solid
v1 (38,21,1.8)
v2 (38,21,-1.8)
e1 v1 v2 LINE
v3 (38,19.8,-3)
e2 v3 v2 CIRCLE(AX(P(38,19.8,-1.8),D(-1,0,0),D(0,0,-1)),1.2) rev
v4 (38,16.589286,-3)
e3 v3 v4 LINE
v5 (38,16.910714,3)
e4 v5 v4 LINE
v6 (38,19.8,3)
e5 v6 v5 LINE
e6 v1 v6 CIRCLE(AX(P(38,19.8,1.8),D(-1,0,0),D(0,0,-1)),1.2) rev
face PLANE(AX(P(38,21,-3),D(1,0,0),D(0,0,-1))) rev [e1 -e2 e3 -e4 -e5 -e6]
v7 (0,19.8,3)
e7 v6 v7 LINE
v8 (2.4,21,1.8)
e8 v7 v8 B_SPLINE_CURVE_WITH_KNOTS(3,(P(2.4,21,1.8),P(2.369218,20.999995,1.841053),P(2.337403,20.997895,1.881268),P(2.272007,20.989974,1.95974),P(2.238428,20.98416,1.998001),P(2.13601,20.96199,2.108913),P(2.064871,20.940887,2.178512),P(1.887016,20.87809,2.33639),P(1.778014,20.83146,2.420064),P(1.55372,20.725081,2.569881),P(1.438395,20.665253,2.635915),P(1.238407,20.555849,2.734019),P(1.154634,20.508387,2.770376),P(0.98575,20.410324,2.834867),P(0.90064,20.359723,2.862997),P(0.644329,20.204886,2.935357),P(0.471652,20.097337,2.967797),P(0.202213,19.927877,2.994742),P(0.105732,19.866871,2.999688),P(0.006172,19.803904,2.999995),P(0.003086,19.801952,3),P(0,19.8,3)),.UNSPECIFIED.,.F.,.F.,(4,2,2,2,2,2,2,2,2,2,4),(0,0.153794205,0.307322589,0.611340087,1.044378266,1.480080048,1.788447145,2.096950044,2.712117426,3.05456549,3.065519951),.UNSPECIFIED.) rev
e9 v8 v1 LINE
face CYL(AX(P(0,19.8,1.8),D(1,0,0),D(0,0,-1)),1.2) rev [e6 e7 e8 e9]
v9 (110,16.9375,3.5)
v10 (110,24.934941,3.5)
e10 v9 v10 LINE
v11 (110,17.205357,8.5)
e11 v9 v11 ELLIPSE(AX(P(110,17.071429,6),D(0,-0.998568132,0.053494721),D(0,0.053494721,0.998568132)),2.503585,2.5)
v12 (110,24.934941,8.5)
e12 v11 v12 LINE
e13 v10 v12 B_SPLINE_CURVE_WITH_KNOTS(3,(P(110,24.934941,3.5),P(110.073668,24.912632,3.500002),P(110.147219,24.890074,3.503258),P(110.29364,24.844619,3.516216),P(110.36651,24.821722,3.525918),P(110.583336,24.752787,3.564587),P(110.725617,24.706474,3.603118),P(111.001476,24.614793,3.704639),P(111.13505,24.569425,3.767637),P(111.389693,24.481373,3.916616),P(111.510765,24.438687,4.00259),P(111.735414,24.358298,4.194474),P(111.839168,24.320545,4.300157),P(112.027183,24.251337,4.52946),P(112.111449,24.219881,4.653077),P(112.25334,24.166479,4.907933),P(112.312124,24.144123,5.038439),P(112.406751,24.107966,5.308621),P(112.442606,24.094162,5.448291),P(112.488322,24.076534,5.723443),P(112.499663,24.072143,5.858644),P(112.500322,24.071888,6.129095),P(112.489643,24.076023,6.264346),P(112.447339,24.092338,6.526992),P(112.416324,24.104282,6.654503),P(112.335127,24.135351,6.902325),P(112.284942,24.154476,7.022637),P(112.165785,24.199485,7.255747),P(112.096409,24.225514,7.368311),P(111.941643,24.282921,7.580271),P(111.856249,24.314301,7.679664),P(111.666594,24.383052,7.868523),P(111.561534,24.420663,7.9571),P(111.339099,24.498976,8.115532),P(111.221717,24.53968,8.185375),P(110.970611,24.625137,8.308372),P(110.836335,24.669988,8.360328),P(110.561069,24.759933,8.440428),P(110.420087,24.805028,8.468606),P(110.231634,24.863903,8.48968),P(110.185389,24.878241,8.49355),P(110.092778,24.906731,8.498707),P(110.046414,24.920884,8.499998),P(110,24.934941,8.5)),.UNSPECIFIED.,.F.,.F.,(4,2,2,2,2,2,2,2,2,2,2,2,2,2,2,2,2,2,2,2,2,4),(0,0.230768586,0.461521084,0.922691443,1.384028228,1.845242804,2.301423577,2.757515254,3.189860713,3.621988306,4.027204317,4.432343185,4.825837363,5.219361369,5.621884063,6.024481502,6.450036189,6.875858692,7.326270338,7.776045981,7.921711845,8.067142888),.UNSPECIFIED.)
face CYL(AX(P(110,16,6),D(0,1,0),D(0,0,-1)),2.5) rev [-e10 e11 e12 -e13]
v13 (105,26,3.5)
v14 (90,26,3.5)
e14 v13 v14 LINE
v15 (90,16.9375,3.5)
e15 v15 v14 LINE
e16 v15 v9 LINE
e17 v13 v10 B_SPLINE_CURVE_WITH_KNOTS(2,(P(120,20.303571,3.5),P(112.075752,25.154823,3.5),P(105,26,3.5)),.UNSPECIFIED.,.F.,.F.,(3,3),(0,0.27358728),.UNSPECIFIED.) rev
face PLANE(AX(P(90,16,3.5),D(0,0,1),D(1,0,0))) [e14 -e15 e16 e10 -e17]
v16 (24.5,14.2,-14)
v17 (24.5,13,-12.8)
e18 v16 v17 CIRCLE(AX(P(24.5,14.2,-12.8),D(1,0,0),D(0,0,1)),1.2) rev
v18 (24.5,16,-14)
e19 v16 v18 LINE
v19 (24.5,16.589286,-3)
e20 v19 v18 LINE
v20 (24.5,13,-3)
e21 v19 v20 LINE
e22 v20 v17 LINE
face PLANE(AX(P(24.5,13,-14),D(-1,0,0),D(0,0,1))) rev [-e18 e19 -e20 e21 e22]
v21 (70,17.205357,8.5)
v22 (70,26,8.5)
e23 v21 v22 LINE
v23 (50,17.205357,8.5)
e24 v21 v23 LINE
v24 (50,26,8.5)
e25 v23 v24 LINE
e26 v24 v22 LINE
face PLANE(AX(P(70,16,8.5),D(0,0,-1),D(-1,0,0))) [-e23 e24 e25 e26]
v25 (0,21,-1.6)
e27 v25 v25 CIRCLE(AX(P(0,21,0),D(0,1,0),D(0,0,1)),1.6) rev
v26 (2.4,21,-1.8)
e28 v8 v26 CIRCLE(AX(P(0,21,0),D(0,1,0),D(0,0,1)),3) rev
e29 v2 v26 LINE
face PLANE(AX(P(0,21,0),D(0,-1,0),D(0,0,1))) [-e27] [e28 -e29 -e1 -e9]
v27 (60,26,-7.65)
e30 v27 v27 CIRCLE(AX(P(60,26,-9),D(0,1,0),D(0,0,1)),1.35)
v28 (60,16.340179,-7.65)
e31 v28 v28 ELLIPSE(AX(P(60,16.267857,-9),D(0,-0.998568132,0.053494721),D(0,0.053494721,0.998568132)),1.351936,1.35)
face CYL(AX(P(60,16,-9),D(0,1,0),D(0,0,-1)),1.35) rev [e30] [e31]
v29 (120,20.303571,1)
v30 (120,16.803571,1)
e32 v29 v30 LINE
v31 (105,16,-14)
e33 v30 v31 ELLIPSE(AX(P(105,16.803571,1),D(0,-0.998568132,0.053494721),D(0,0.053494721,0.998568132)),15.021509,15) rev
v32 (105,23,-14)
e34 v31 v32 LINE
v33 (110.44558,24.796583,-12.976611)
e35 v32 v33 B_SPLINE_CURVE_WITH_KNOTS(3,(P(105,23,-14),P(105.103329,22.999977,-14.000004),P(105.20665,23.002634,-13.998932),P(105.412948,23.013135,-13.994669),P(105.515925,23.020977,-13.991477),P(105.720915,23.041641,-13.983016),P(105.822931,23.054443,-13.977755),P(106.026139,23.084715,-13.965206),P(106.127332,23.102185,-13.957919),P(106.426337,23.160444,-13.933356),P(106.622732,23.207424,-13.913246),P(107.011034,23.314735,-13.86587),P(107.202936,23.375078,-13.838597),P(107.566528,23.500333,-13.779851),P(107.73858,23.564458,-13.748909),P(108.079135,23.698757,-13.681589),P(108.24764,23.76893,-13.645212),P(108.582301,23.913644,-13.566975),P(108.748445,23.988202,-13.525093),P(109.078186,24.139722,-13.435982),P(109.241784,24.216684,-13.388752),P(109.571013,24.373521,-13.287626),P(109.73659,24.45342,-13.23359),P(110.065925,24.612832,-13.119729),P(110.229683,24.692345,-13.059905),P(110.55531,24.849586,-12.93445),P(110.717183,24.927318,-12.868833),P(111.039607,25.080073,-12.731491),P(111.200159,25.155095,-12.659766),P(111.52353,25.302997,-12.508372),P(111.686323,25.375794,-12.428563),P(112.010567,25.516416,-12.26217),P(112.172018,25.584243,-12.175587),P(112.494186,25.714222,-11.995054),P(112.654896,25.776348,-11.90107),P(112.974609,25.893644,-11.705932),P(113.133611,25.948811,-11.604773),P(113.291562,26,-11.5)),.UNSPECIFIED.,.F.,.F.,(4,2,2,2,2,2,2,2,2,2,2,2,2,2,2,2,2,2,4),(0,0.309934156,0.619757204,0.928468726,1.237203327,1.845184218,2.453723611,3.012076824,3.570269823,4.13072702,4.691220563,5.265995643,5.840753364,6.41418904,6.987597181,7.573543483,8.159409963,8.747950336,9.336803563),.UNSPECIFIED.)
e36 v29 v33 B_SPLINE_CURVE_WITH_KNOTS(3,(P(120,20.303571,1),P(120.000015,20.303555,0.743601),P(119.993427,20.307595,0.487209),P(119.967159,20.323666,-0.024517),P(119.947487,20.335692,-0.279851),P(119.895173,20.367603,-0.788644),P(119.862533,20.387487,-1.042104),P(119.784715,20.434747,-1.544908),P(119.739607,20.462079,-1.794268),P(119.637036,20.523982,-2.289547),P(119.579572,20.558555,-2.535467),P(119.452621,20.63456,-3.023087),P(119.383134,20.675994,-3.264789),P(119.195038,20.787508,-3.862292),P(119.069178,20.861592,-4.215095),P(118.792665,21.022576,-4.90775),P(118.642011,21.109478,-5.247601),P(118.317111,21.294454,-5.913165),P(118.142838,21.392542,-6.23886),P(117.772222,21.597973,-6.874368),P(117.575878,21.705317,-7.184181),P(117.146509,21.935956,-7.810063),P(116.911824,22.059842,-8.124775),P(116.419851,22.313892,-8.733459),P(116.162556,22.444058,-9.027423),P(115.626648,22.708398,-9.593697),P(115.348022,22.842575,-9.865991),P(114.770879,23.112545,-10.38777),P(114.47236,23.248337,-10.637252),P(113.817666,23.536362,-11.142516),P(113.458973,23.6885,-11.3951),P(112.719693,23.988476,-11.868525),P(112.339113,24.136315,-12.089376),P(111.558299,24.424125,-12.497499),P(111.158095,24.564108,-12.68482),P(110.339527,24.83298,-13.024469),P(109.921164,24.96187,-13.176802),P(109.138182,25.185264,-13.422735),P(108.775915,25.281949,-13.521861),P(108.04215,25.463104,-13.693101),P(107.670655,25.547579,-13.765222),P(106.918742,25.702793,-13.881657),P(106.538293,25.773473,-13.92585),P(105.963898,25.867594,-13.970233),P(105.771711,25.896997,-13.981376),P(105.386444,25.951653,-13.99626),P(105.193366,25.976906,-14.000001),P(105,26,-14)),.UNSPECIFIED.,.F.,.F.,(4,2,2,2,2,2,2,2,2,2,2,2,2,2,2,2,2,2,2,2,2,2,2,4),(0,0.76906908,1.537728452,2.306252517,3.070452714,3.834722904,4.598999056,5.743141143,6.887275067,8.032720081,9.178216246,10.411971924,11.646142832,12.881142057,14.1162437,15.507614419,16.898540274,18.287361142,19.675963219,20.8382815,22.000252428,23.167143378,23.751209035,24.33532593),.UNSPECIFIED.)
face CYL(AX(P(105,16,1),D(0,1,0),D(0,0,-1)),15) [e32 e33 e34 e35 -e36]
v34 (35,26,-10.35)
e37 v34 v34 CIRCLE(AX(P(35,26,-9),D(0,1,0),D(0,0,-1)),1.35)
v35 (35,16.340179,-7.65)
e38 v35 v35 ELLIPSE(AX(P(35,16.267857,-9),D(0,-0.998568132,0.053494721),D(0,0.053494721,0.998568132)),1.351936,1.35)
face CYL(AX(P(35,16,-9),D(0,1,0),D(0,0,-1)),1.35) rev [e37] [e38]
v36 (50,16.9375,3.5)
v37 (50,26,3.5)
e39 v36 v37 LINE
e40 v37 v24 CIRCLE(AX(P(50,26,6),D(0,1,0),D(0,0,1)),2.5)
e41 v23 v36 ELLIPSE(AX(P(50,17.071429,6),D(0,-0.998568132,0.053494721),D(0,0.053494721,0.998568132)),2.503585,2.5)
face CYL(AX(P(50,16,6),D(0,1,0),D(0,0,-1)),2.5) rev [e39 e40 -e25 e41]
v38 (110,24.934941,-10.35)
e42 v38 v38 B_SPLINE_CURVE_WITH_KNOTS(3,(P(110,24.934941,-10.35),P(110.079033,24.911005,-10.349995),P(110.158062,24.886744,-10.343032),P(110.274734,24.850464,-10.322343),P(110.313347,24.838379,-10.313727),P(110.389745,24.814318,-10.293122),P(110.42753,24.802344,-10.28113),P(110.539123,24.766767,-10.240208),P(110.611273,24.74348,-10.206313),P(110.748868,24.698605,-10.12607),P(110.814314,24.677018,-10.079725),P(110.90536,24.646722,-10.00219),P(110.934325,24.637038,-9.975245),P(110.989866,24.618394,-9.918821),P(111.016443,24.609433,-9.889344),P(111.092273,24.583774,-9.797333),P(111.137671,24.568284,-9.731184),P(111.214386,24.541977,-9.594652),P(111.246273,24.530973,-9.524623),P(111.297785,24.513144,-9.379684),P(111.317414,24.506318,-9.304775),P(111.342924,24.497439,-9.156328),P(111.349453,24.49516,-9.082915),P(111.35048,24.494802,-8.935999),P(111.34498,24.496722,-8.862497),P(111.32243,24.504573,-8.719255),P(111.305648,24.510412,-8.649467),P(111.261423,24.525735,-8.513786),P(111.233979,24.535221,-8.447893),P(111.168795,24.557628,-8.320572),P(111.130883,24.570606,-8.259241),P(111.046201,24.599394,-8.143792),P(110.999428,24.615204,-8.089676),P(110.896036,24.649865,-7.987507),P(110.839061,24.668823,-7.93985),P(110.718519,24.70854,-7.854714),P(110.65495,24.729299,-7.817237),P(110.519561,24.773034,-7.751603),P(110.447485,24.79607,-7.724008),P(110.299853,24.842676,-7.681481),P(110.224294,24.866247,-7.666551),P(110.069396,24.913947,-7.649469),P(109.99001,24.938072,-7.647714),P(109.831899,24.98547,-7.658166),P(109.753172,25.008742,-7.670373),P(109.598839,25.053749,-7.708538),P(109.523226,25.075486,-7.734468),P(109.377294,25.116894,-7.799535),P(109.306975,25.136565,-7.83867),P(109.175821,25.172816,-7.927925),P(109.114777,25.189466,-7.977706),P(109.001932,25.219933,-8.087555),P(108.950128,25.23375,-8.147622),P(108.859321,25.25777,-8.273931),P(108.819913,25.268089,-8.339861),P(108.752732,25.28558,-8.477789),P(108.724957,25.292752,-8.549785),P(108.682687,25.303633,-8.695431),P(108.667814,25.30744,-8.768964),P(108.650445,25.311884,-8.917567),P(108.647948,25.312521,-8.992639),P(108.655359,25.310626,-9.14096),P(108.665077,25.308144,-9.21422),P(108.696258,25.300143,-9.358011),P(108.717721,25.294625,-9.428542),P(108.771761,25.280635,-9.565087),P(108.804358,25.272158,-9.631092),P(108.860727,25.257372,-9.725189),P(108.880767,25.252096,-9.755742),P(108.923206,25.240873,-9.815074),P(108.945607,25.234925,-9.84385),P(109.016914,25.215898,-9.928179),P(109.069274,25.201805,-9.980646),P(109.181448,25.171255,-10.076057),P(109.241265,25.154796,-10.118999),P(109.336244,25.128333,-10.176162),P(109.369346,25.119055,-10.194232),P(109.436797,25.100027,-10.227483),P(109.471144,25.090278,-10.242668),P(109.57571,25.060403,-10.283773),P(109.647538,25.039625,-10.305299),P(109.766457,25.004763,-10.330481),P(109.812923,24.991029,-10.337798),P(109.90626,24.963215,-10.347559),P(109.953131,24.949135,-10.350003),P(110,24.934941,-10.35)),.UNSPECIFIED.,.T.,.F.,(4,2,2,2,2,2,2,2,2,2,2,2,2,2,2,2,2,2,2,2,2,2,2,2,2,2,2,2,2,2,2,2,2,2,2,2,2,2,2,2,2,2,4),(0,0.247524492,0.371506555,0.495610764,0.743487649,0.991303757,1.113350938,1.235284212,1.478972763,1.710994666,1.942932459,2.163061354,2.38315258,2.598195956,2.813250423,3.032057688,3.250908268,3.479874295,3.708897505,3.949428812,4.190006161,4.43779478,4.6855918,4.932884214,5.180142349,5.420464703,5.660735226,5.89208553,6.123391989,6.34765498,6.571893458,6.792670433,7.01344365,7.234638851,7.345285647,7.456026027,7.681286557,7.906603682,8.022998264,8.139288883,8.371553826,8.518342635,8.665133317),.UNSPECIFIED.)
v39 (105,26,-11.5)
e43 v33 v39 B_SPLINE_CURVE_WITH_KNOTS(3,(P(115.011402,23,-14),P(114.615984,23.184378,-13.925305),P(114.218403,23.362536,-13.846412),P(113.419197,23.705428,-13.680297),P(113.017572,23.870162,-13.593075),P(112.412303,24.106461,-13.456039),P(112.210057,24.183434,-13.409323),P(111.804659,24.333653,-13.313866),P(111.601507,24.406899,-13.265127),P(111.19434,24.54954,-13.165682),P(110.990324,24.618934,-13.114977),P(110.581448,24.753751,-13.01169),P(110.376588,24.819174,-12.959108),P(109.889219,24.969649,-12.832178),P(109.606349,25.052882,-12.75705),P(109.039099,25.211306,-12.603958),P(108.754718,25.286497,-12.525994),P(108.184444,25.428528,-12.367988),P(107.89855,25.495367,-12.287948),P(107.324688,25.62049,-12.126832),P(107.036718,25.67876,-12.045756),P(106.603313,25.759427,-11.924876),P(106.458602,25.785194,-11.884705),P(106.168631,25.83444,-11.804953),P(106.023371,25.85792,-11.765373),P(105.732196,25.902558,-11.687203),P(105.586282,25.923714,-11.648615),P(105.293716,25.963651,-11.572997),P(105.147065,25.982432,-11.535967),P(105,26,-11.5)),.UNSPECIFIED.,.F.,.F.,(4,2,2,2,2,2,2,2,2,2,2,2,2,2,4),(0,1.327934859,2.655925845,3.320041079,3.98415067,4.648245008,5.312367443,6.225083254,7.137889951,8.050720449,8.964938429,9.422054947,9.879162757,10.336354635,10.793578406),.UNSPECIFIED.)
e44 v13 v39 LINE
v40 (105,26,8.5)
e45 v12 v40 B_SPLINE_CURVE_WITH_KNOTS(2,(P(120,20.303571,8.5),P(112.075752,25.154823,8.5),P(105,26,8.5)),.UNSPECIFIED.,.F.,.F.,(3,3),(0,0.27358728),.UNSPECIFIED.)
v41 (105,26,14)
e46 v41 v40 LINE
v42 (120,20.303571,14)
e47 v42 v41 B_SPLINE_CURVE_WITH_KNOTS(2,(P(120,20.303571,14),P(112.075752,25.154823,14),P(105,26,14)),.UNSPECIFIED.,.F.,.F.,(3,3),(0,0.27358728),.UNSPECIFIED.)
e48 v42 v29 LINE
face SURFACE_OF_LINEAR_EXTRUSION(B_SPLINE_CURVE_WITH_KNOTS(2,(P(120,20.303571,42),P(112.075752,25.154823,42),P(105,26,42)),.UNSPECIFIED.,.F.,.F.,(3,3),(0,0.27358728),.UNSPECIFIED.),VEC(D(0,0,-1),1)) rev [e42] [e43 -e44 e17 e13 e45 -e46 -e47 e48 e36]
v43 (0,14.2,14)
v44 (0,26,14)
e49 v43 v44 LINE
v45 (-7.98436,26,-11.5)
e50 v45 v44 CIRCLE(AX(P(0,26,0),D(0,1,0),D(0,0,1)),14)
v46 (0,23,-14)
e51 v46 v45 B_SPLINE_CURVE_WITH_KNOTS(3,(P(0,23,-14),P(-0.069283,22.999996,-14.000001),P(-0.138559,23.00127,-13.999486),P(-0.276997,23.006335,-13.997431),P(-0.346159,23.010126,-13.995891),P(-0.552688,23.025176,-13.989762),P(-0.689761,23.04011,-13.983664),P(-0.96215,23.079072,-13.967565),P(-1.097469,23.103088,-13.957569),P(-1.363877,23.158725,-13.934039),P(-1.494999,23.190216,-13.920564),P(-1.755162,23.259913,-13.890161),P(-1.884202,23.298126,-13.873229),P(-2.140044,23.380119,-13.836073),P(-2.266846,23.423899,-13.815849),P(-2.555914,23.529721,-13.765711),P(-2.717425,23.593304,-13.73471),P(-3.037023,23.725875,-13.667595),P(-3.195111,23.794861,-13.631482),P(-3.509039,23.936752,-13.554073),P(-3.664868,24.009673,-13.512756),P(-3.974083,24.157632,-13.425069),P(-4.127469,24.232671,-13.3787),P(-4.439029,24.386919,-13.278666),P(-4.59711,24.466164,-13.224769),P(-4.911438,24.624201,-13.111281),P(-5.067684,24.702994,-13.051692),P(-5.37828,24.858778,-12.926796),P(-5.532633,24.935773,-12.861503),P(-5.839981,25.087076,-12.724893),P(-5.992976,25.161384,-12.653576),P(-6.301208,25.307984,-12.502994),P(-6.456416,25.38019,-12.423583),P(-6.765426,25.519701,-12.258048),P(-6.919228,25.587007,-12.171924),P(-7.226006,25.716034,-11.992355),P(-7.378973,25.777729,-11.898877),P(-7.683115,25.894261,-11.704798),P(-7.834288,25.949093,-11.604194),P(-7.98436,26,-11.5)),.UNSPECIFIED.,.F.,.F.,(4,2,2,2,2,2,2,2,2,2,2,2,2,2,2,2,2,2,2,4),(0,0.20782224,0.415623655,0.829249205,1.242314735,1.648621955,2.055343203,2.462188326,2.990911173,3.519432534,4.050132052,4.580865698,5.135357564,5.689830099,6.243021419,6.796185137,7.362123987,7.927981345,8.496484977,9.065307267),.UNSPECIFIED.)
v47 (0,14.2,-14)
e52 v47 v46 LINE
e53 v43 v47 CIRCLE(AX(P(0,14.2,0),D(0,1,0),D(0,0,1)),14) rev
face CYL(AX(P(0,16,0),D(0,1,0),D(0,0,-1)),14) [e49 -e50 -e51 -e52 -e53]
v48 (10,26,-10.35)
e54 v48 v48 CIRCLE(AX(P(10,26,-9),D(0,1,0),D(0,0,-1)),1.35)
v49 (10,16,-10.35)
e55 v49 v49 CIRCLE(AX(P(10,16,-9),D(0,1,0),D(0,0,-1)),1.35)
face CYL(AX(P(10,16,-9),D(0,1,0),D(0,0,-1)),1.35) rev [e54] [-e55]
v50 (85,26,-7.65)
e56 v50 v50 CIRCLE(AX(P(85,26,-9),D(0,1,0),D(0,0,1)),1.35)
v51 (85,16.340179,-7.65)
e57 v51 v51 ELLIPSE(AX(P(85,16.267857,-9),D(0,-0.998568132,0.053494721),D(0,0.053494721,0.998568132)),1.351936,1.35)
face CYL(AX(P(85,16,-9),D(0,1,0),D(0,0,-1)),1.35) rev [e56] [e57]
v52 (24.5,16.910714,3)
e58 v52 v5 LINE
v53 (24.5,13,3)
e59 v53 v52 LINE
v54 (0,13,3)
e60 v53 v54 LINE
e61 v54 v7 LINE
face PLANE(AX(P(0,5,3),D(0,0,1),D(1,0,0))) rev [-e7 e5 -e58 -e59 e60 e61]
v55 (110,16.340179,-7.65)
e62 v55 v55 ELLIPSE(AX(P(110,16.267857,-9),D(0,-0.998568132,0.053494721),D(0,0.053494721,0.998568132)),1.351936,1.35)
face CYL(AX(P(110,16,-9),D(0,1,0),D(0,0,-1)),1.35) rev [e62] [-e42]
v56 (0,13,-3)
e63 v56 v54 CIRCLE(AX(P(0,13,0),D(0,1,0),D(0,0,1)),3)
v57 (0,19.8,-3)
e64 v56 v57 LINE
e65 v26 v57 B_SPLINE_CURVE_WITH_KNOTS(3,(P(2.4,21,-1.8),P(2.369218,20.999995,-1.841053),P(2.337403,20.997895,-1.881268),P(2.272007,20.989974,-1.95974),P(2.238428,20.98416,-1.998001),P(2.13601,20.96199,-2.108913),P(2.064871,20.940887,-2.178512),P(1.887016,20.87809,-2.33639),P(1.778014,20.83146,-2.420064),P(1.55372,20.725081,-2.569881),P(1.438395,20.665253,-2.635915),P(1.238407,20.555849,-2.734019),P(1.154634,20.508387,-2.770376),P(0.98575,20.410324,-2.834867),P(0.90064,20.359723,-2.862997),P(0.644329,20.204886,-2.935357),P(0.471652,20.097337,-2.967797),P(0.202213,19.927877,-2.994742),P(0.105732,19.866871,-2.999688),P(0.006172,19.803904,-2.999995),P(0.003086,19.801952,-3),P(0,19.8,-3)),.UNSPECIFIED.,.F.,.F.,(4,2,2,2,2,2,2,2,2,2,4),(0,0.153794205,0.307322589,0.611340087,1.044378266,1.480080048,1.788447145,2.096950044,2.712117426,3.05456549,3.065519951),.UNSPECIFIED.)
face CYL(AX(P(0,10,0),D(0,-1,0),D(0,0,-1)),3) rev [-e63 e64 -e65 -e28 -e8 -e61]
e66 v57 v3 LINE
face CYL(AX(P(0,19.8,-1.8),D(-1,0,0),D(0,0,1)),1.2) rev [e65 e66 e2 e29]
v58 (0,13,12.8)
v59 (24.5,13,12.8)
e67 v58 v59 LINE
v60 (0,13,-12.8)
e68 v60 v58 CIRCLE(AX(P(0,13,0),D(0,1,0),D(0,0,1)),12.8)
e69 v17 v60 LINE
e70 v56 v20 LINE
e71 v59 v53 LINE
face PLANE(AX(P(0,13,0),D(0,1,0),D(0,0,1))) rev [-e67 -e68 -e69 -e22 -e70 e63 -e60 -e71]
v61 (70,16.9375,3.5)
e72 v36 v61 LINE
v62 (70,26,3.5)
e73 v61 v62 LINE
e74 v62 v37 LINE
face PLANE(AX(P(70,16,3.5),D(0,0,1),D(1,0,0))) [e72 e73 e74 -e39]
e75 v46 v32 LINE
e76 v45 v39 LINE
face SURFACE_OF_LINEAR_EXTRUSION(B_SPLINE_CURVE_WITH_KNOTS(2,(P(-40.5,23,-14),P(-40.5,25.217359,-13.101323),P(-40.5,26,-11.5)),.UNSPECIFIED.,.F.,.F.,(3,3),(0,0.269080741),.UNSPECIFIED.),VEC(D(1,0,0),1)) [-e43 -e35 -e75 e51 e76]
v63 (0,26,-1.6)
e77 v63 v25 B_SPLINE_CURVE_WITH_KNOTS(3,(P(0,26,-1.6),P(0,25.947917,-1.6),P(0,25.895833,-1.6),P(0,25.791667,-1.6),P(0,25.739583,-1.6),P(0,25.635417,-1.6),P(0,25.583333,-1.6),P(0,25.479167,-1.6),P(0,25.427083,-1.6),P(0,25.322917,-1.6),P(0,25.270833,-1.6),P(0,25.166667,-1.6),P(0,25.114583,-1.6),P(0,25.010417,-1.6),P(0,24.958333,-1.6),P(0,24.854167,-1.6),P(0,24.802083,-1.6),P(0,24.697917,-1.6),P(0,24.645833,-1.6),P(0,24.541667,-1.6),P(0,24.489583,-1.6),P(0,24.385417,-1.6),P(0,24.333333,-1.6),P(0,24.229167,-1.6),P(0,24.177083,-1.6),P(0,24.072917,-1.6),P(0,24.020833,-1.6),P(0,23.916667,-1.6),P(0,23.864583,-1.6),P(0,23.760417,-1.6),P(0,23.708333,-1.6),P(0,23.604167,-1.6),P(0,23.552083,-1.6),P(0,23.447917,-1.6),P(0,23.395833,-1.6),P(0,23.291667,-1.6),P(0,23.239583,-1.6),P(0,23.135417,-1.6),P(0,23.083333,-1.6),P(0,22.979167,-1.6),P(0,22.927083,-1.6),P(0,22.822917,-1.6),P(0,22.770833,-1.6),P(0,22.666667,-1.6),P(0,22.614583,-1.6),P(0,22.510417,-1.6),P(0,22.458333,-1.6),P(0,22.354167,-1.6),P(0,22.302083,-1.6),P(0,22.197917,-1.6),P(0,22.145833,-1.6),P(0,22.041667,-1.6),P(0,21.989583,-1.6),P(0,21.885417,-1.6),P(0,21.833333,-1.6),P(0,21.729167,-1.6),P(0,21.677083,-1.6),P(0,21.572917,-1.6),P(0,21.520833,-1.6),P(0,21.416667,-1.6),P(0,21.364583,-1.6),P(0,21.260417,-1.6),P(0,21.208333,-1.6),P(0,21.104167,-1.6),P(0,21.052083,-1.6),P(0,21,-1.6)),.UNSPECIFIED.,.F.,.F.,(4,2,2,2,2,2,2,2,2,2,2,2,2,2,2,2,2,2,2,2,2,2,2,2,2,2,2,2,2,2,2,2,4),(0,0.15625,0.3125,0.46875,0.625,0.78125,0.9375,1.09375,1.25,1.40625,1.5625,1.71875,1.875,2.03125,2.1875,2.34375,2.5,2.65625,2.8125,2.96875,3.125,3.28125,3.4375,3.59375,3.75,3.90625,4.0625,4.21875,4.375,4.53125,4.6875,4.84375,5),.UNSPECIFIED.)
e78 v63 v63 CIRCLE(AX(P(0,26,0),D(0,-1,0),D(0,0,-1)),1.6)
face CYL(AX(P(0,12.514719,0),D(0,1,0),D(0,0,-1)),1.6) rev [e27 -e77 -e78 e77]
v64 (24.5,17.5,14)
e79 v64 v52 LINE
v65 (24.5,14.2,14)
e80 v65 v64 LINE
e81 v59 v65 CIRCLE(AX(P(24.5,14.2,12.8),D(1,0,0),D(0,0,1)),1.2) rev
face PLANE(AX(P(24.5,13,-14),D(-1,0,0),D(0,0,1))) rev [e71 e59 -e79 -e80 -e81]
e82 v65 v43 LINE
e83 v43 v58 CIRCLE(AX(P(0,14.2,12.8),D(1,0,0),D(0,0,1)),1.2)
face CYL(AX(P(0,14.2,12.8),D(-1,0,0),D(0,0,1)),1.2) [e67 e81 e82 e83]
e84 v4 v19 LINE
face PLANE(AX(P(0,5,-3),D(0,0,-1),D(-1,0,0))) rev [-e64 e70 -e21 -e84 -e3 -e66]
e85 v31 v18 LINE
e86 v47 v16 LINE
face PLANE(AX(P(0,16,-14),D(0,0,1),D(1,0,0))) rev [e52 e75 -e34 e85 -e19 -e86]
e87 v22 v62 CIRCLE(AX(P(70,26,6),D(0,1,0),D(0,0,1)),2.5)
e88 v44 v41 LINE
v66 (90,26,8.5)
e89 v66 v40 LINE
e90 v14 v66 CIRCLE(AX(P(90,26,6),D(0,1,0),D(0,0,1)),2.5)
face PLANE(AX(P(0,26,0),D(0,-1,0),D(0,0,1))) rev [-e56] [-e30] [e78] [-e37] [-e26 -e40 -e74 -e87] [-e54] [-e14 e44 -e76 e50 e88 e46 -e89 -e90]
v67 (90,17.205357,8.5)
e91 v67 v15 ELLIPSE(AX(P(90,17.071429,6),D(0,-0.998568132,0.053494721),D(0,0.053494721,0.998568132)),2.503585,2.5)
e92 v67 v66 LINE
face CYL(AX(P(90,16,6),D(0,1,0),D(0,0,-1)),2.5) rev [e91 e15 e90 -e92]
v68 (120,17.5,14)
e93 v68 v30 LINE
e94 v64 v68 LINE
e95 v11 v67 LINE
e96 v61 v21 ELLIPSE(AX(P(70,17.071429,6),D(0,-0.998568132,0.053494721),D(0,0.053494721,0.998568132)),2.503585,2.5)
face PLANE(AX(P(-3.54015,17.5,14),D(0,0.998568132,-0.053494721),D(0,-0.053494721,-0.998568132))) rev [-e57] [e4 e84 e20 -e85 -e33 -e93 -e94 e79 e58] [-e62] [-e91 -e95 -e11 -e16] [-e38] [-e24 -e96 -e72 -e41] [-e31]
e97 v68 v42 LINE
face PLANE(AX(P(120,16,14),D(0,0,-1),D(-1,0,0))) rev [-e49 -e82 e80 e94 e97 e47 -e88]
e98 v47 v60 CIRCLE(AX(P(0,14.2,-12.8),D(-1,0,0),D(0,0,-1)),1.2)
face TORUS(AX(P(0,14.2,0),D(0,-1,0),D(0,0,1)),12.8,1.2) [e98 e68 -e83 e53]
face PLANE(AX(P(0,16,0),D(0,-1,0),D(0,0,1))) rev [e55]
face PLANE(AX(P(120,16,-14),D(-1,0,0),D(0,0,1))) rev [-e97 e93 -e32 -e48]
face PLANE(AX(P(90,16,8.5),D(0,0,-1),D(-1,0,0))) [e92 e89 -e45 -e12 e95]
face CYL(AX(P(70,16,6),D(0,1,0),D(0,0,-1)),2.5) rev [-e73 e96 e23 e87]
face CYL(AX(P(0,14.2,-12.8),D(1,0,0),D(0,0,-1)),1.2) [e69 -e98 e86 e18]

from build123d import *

# Parameters (mm, degrees)
SKETCH1_R           = 1.35
SKETCH1_R_2         = 3
BOSS_EXTRUDE1_DEPTH = 10
SKETCH9_R           = 3
BOSS_EXTRUDE2_DEPTH = 3
SKETCH10_W          = 38
SKETCH10_H          = 6
CUT_EXTRUDE3_DEPTH  = 8
FILLET3_R           = 15
FILLET4_R           = 1.2
CUT_EXTRUDE4_REACH  = 137.355
CUT_EXTRUDE5_DEPTH  = 56
SKETCH13_R          = 3
SKETCH13_R_2        = 1.6
BOSS_EXTRUDE3_DEPTH = 5
FILLET5_R           = 1.2
CUT_EXTRUDE6_DEPTH  = 160.5
SKETCH15_W          = 146.140561772
SKETCH15_H          = 38.947987949
CUT_EXTRUDE7_DEPTH  = 13


with BuildPart() as part:
    # Sketch1 → Boss-Extrude1 (new body)
    with BuildSketch(Plane(origin=(0, 0, 0), x_dir=(1, 0, 0), z_dir=(0, 1, 0))):
        with BuildLine():
            Line((0, 14), (120, 14))
            Line((120, 14), (120, -14))
            Line((120, -14), (0, -14))
            ThreePointArc((0, -14), (-14, 0), (0, 14))
        make_face()
        with Locations(Location((85, 9, 0), (0, 0, 270))):
            Circle(SKETCH1_R, mode=Mode.SUBTRACT)
        with Locations(Location((60, 9, 0), (0, 0, 270))):
            Circle(SKETCH1_R, mode=Mode.SUBTRACT)
        with Locations(Location((110, 9, 0), (0, 0, 270))):
            Circle(SKETCH1_R, mode=Mode.SUBTRACT)
        with Locations(Location((10, 9, 0), (0, 0, 90))):
            Circle(SKETCH1_R, mode=Mode.SUBTRACT)
        with Locations(Location((35, 9, 0), (0, 0, 90))):
            Circle(SKETCH1_R, mode=Mode.SUBTRACT)
        with Locations(Location((0, 0, 0), (0, 0, 270))):
            Circle(SKETCH1_R_2, mode=Mode.SUBTRACT)
        with BuildLine():
            Line((70, -8.5), (50, -8.5))
            ThreePointArc((50, -8.5), (47.5, -6), (50, -3.5))
            Line((50, -3.5), (70, -3.5))
            ThreePointArc((70, -3.5), (72.5, -6), (70, -8.5))
        make_face(mode=Mode.SUBTRACT)
        with BuildLine():
            Line((90, -3.5), (110, -3.5))
            ThreePointArc((110, -3.5), (112.5, -6), (110, -8.5))
            Line((110, -8.5), (90, -8.5))
            ThreePointArc((90, -8.5), (87.5, -6), (90, -3.5))
        make_face(mode=Mode.SUBTRACT)
    extrude(amount=BOSS_EXTRUDE1_DEPTH)

    # Sketch9 → Boss-Extrude2 (add)
    with BuildSketch(Plane(origin=(0, 10, 0), x_dir=(1, 0, 0), z_dir=(0, 1, 0))):
        with BuildLine():
            Line((0, 14), (24.5, 14))
            Line((24.5, 14), (24.5, -14))
            Line((24.5, -14), (0, -14))
            ThreePointArc((0, -14), (-14, 0), (0, 14))
        make_face()
        with Locations(Location((0, 0, 0), (0, 0, 270))):
            Circle(SKETCH9_R, mode=Mode.SUBTRACT)
    extrude(amount=BOSS_EXTRUDE2_DEPTH)

    # Sketch10 → Cut-Extrude3 (cut)
    with BuildSketch(Plane(origin=(0, 13, 0), x_dir=(1, 0, 0), z_dir=(0, 1, 0))):
        with Locations((19, 0)):
            Rectangle(SKETCH10_W, SKETCH10_H)
    extrude(amount=-CUT_EXTRUDE3_DEPTH, mode=Mode.SUBTRACT)

    # Fillet3
    fillet3_edges = [part.edges().sort_by_distance(p)[0] for p in [
        (120, 5, -14),
    ]]
    fillet(fillet3_edges, radius=FILLET3_R)

    # Fillet4
    # the kernel refuses this fillet: 1.2 mm, written as the material it adds along each edge
    with BuildSketch(Plane(origin=(-3, 5, -3), x_dir=(0, 1, 0), z_dir=(1, 0, 0))) as fillet4_piece_1_section:
        with BuildLine():
            CenterArc((FILLET4_R, FILLET4_R), FILLET4_R, 180, 90)
            Line((0, FILLET4_R), (0, 0))
            Line((0, 0), (FILLET4_R, 0))
        make_face()
    fillet4_piece_1 = extrude(amount=44, mode=Mode.PRIVATE)
    fillet4_piece_1 = fillet4_piece_1 - Plane(origin=(0, 5.276873311, 0), x_dir=(0, 0, 1), z_dir=(0, -1, 0)) * Cylinder(3, 93, mode=Mode.PRIVATE)
    add(fillet4_piece_1)
    with BuildSketch(Plane(origin=(41, 5, 3), x_dir=(0, 1, 0), z_dir=(-1, 0, 0))) as fillet4_piece_2_section:
        with BuildLine():
            CenterArc((FILLET4_R, FILLET4_R), FILLET4_R, 180, 90)
            Line((0, FILLET4_R), (0, 0))
            Line((0, 0), (FILLET4_R, 0))
        make_face()
    fillet4_piece_2 = extrude(amount=44, mode=Mode.PRIVATE)
    fillet4_piece_2 = fillet4_piece_2 - Plane(origin=(0, 5.276873499, 0), x_dir=(0, 0, 1), z_dir=(0, -1, 0)) * Cylinder(3, 93, mode=Mode.PRIVATE)
    add(fillet4_piece_2)

    # Cut-Extrude4: up to this face of the body (flat: up to its plane)
    cut_extrude4_end = Plane(part.part.faces().sort_by_distance((24.5, 11.5, 8.5))[0])
    # Sketch4 → Cut-Extrude4 (cut, up to the picked face)
    with BuildSketch(Plane(origin=(120, 0, 0), x_dir=(0, 0, -1), z_dir=(1, 0, 0)), mode=Mode.PRIVATE) as cut_extrude4_sk1:
        Polygon((-14, 10), (-14, 8.5), (14, 10), align=None)
    cut_extrude4_tool1 = split(extrude(cut_extrude4_sk1.sketch, amount=-CUT_EXTRUDE4_REACH, mode=Mode.PRIVATE), bisect_by=cut_extrude4_end, keep=Keep.BOTH, mode=Mode.PRIVATE)
    add(cut_extrude4_tool1.solids().sort_by(Axis((120, 9.5, 4.666667), (-1, 0, 0)))[0], mode=Mode.SUBTRACT)

    # Sketch11 → Cut-Extrude5 (cut)
    with BuildSketch(Plane(origin=(0, 0, -14), x_dir=(-1, 0, 0), z_dir=(0, 0, -1))):
        with BuildLine():
            add(Edge.make_bspline(
                [(-120, 5.696428571), (-112.075751897, 0.845176506), (-105, 0)],
                knots=[0, 0, 0, 0.27358728, 0.27358728, 0.27358728], degree=2))
            Line((-105, 0), (-120, 0))
            Line((-120, 0), (-120, 5.696428571))
        make_face()
    extrude(amount=-CUT_EXTRUDE5_DEPTH, mode=Mode.SUBTRACT)

    # Sketch13 → Boss-Extrude3 (add)
    with BuildSketch(Plane.XZ):
        Circle(SKETCH13_R)
        with Locations(Location((0, 0, 0), (0, 0, 270))):
            Circle(SKETCH13_R_2, mode=Mode.SUBTRACT)
    extrude(amount=-BOSS_EXTRUDE3_DEPTH)

    # Fillet5
    fillet5_edges = [part.edges().sort_by_distance(p)[0] for p in [
        (-14, 13, 0),
        (12.25, 13, 14),
        (12.25, 13, -14),
    ]]
    fillet(fillet5_edges, radius=FILLET5_R)

    # Sketch14 → Cut-Extrude6 (cut)
    with BuildSketch(Plane(origin=(120, 0, 0), x_dir=(0, 0, -1), z_dir=(1, 0, 0))):
        with BuildLine():
            Line((14, 0), (11.5, 0))
            add(Edge.make_bspline(
                [(11.5, 0), (13.101323316, 0.782640841), (14, 3)],
                knots=[0, 0, 0, 0.269080741, 0.269080741, 0.269080741], degree=2))
            Line((14, 3), (14, 0))
        make_face()
    extrude(amount=-CUT_EXTRUDE6_DEPTH, mode=Mode.SUBTRACT)

    # Mirror1: part across plane


with BuildPart() as part_1:
    add(part.part)
    add(part.part.mirror(Plane.ZX.offset(13)))

    # Sketch15 → Cut-Extrude7 (cut)
    with BuildSketch(Plane.XZ):
        with Locations((46.929719114, -5.473993975)):
            Rectangle(SKETCH15_W, SKETCH15_H)
    extrude(amount=-CUT_EXTRUDE7_DEPTH, mode=Mode.SUBTRACT)


solid = part_1.part
